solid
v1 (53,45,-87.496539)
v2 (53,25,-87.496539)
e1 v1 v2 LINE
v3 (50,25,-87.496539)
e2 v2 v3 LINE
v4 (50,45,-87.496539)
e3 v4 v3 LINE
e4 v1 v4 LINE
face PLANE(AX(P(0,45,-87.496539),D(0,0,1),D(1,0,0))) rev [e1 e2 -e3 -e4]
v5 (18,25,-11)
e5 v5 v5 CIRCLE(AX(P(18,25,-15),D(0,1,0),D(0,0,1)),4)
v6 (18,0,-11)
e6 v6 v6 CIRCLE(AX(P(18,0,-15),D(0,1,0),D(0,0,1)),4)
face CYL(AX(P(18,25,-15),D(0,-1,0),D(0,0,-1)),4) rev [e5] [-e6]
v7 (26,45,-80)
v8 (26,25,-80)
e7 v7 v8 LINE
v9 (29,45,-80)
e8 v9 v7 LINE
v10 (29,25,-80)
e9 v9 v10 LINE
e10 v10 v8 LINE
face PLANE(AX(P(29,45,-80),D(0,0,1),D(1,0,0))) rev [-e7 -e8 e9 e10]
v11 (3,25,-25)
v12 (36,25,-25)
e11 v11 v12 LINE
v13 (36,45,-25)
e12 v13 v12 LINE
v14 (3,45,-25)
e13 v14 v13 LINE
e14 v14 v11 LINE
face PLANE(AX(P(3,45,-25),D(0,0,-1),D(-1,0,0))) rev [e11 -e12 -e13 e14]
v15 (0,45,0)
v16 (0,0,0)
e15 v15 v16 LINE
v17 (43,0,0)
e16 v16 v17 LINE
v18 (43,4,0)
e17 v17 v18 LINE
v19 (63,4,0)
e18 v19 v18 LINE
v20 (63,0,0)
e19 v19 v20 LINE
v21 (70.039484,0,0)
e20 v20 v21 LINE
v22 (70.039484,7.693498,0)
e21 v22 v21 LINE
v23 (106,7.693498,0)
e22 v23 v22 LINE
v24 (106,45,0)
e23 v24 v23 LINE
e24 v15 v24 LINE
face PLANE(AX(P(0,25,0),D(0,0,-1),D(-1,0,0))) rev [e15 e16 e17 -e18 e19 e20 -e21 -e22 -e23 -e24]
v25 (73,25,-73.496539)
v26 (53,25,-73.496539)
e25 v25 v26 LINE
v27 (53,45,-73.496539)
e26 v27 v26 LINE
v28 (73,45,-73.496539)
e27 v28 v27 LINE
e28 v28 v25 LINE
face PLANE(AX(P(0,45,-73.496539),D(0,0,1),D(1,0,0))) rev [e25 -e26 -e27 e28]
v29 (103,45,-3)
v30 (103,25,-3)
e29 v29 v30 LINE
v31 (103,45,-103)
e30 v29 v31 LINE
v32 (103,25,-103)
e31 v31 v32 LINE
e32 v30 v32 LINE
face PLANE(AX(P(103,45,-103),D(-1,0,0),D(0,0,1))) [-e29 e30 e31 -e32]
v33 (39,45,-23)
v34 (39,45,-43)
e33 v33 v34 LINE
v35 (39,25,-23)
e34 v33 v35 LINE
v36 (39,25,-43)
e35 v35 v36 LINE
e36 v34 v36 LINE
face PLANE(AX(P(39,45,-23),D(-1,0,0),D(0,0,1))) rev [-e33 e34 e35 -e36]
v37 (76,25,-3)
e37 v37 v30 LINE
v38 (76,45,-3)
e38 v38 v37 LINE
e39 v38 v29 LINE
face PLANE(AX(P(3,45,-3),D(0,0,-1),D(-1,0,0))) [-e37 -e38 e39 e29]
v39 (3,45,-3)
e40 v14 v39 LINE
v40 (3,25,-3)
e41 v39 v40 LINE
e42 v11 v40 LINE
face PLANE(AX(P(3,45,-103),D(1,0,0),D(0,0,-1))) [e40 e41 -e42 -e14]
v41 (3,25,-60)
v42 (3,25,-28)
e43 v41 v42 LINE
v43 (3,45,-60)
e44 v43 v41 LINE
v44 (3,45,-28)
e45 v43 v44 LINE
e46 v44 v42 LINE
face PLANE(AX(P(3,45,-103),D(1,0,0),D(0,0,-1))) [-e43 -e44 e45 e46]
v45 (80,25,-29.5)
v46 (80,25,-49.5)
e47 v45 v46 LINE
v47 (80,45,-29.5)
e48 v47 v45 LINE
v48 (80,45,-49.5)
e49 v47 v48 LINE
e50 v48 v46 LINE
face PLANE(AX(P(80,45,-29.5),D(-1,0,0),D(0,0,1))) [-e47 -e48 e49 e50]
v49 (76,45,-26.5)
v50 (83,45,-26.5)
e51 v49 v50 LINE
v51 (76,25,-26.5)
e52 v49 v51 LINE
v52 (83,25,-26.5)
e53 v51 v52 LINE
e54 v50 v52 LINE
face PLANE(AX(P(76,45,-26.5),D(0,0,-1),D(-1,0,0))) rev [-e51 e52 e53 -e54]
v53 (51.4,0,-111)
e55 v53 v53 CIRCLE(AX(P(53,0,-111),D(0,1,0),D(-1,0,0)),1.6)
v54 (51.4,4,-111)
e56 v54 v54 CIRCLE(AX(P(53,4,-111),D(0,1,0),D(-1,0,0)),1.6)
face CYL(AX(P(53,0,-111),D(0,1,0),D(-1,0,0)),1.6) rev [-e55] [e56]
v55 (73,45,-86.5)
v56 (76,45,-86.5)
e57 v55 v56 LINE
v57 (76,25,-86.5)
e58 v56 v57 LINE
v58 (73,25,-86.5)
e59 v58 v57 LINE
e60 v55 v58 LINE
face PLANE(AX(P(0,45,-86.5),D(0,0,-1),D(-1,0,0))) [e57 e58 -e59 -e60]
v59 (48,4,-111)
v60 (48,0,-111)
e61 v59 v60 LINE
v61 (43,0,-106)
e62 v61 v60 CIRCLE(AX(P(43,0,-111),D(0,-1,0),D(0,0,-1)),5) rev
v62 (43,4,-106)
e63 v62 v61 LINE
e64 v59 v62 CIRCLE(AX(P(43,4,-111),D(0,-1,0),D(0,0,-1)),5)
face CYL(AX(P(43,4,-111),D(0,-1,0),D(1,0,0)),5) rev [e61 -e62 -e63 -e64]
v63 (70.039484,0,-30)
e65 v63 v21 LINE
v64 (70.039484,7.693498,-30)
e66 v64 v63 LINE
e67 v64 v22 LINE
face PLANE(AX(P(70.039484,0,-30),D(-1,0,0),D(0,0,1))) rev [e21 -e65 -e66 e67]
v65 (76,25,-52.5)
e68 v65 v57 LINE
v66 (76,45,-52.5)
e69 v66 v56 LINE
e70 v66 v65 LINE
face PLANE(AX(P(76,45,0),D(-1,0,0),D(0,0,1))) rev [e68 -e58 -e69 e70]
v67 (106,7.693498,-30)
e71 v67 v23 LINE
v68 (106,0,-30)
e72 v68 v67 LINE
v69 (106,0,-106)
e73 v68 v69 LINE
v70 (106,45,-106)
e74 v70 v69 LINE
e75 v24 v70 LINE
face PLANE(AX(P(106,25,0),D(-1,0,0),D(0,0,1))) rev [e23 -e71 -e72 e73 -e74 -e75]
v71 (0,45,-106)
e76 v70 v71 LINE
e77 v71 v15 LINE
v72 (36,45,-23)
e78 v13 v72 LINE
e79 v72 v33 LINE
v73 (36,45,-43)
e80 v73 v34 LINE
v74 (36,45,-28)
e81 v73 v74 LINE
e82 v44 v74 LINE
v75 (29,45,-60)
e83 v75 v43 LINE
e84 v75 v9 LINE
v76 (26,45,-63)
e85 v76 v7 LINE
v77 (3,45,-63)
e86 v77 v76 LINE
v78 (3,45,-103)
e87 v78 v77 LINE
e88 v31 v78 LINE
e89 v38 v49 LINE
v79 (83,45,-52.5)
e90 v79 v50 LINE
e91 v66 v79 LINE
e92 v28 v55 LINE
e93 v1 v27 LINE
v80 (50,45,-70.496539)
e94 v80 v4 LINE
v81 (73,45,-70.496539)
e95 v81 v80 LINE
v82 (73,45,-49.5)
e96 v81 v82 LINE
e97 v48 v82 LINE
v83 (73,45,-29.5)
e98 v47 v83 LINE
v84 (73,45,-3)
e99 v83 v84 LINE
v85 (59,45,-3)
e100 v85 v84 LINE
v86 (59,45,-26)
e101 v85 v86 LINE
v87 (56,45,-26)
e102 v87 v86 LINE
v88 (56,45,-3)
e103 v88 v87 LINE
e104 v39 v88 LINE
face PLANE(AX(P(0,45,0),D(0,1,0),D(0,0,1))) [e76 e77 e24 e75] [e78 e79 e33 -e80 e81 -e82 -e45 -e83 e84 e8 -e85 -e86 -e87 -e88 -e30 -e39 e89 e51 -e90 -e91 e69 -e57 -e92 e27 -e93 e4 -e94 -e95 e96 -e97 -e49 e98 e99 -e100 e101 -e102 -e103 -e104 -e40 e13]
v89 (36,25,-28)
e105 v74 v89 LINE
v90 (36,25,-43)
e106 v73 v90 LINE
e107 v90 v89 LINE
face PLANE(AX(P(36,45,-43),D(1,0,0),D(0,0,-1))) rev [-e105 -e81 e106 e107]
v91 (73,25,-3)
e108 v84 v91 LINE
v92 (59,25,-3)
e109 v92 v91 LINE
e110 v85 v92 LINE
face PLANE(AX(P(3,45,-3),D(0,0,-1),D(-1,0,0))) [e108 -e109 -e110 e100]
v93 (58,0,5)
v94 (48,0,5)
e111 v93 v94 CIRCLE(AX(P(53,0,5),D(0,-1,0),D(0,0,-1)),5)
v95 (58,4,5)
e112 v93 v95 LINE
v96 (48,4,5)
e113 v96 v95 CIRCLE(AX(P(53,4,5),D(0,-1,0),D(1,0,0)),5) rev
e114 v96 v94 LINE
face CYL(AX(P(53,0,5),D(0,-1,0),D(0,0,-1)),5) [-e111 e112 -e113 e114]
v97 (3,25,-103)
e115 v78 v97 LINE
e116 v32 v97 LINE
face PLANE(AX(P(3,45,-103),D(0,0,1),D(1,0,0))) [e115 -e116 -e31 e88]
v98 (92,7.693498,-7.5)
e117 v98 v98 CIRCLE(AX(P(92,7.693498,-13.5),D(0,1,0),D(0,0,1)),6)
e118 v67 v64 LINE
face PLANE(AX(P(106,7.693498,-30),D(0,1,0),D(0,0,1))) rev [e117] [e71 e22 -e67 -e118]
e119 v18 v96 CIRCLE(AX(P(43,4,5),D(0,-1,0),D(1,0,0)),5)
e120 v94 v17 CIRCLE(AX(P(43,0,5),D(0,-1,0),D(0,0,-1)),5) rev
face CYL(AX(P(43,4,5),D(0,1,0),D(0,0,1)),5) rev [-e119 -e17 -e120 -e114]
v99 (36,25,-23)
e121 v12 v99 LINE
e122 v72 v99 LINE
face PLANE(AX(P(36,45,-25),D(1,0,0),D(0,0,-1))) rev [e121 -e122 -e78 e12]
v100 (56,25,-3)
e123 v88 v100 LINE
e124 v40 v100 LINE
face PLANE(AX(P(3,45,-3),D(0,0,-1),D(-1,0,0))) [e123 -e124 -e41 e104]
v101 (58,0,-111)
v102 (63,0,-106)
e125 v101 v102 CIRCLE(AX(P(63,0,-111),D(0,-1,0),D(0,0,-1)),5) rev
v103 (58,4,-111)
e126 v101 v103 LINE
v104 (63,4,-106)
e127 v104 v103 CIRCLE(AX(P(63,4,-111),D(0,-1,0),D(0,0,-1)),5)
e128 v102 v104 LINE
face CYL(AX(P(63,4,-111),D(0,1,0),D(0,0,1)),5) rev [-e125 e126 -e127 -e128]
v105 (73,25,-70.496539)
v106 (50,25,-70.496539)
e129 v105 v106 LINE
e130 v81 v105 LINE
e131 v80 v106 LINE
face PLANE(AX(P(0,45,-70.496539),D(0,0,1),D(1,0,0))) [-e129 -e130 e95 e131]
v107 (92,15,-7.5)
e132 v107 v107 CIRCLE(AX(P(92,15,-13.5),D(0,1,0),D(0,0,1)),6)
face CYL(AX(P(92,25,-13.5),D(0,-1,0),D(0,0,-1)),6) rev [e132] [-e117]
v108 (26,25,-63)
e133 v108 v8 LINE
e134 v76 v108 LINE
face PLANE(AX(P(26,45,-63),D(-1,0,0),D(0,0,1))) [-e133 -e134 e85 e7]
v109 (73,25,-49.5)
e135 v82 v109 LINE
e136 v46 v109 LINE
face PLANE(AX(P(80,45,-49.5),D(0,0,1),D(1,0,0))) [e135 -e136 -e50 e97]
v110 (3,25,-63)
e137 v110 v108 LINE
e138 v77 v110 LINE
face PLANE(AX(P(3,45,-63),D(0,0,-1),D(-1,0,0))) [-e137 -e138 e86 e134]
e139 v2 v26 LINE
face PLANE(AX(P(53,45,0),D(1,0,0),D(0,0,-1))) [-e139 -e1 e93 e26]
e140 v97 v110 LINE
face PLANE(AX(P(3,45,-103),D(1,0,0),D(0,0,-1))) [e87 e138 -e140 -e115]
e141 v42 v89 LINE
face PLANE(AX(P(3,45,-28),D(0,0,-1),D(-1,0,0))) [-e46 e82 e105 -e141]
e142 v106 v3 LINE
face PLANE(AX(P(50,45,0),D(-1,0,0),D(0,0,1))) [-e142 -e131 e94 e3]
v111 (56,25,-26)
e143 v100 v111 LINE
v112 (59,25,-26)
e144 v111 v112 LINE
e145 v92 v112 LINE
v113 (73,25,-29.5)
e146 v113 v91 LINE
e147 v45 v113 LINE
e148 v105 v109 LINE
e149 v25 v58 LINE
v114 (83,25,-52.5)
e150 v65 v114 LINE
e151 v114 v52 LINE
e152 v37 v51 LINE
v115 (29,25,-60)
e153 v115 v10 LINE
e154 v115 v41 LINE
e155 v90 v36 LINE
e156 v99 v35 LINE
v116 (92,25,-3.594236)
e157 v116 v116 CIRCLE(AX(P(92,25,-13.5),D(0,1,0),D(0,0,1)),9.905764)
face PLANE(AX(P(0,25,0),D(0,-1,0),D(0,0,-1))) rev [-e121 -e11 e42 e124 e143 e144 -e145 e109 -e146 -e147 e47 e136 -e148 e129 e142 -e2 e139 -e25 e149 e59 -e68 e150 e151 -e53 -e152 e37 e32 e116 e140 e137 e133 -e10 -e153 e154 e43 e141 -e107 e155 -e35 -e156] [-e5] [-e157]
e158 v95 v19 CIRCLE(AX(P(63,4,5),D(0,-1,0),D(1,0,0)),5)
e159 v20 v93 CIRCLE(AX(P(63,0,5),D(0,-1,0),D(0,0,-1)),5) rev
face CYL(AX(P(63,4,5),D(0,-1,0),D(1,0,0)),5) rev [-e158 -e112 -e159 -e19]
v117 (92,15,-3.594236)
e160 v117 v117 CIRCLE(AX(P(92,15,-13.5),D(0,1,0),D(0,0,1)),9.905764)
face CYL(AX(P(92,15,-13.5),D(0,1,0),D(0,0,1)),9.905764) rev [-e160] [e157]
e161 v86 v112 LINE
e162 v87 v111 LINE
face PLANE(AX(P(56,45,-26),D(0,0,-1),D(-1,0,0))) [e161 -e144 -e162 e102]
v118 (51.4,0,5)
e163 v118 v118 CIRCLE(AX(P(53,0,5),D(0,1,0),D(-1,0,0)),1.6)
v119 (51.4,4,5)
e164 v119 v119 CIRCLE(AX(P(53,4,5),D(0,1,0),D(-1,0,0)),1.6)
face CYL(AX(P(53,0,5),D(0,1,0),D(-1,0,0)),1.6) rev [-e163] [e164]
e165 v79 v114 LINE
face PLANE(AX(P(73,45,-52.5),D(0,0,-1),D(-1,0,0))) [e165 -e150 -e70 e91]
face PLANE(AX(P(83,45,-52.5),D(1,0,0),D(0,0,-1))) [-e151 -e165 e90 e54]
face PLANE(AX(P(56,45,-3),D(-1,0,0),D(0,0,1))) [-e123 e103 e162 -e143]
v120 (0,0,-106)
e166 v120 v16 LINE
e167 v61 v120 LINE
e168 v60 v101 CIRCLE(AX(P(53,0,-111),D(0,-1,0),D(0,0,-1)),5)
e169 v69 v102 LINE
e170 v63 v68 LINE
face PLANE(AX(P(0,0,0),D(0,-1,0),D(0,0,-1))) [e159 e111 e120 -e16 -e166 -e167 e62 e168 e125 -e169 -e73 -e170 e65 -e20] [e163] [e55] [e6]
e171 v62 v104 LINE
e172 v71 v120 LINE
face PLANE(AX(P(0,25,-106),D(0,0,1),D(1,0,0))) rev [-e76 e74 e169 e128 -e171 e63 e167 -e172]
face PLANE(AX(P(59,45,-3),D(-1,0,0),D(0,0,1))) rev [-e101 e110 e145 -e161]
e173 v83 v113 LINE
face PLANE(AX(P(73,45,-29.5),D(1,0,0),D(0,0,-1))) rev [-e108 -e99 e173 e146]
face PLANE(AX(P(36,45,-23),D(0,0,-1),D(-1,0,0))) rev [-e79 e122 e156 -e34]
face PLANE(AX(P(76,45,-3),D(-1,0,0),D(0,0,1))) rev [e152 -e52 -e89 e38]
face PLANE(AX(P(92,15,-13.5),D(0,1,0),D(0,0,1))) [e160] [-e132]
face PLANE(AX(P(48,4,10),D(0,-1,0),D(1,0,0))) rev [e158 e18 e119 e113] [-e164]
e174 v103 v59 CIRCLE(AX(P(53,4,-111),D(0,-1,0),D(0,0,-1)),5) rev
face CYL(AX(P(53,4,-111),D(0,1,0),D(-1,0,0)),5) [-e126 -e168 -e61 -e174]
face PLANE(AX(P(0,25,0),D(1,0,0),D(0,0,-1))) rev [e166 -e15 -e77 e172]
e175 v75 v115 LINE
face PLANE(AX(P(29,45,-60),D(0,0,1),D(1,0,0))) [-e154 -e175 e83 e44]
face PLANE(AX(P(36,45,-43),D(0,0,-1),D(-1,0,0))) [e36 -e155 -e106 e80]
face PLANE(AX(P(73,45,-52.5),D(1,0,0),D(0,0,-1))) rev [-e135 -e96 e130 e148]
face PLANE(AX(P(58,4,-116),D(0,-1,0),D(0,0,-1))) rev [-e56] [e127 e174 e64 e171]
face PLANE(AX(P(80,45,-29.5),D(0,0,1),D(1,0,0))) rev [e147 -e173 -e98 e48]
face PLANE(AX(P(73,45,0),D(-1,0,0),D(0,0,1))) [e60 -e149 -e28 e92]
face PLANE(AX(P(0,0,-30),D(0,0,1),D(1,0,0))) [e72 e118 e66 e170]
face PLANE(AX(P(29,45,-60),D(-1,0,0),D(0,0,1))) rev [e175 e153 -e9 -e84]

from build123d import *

# Parameters (mm, degrees)
SKETCH2_W           = 106
SKETCH2_H           = 106
SKETCH2_R           = 4
SKETCH2_R_2         = 6
BOSS_EXTRUDE1_DEPTH = 25
SKETCH3_W           = 106
SKETCH3_H           = 106
SKETCH3_W_2         = 100
SKETCH3_H_2         = 100
BOSS_EXTRUDE2_DEPTH = 20
SKETCH5_W           = 3
SKETCH5_H           = 23
BOSS_EXTRUDE3_DEPTH = 20
SKETCH7_W           = 20
SKETCH7_H           = 3
BOSS_EXTRUDE4_DEPTH = 20
SKETCH9_R           = 9.905763918
CUT_EXTRUDE1_DEPTH  = 10
SKETCH10_W          = 10
SKETCH10_H          = 4
BOSS_EXTRUDE5_DEPTH = 10
SKETCH11_W          = 10
SKETCH11_H          = 4
BOSS_EXTRUDE6_DEPTH = 10
FILLET2_RADIUS      = 5
FILLET2_LENGTH      = 4
FILLET3_R           = 5
FILLET4_R           = 5
FILLET5_R           = 5
SKETCH13_R          = 1.6
CUT_EXTRUDE2_DEPTH  = 163.397660082
SKETCH14_W          = 35.96051594
SKETCH14_H          = 7.693498276
CUT_EXTRUDE3_DEPTH  = 30


with BuildPart() as part:
    # Sketch2 → Boss-Extrude1 (new body)
    with BuildSketch(Plane(origin=(0, 0, 0), x_dir=(1, 0, 0), z_dir=(0, 1, 0))):
        with Locations((53, 53)):
            Rectangle(SKETCH2_W, SKETCH2_H)
        with Locations(Location((18, 15, 0), (0, 0, 270))):
            Circle(SKETCH2_R, mode=Mode.SUBTRACT)
        with Locations(Location((92, 13.5, 0), (0, 0, 270))):
            Circle(SKETCH2_R_2, mode=Mode.SUBTRACT)
    extrude(amount=BOSS_EXTRUDE1_DEPTH)

    # Sketch3 → Boss-Extrude2 (add)
    with BuildSketch(Plane(origin=(0, 25, 0), x_dir=(1, 0, 0), z_dir=(0, 1, 0))):
        with Locations((53, 53)):
            Rectangle(SKETCH3_W, SKETCH3_H)
        with Locations((53, 53)):
            Rectangle(SKETCH3_W_2, SKETCH3_H_2, mode=Mode.SUBTRACT)
    extrude(amount=BOSS_EXTRUDE2_DEPTH)

    # Sketch5 → Boss-Extrude3 (add)
    with BuildSketch(Plane(origin=(0, 25, 0), x_dir=(1, 0, 0), z_dir=(0, 1, 0))):
        Polygon((3, 28), (3, 25), (36, 25), (36, 23), (39, 23), (39, 43), (36, 43), (36, 28), align=None)
        Polygon((83, 52.5), (83, 26.5), (76, 26.5), (76, 3), (73, 3), (73, 29.5), (80, 29.5), (80, 49.5), (73, 49.5), (73, 52.5), align=None)
        Polygon((3, 63), (3, 60), (29, 60), (29, 80), (26, 80), (26, 63), align=None)
        with Locations((57.5, 14.5)):
            Rectangle(SKETCH5_W, SKETCH5_H)
    extrude(amount=BOSS_EXTRUDE3_DEPTH)

    # Sketch7 → Boss-Extrude4 (add)
    with BuildSketch(Plane(origin=(0, 25, 0), x_dir=(1, 0, 0), z_dir=(0, 1, 0))):
        Polygon((50, 70.496538655), (53, 70.496538655), (53, 73.496538655), (53, 87.496538655), (50, 87.496538655), align=None)
        with Locations((63, 71.996538655)):
            Rectangle(SKETCH7_W, SKETCH7_H)
        Polygon((73, 70.496538655), (73, 52.5), (76, 52.5), (76, 86.5), (73, 86.5), (73, 73.496538655), align=None)
    extrude(amount=BOSS_EXTRUDE4_DEPTH)

    # Sketch9 → Cut-Extrude1 (cut)
    with BuildSketch(Plane(origin=(0, 25, 0), x_dir=(1, 0, 0), z_dir=(0, 1, 0))):
        with Locations(Location((92, 13.5, 0), (0, 0, 270))):
            Circle(SKETCH9_R)
    extrude(amount=-CUT_EXTRUDE1_DEPTH, mode=Mode.SUBTRACT)

    # Sketch10 → Boss-Extrude5 (add)
    with BuildSketch(Plane.XY):
        with Locations((53, 2)):
            Rectangle(SKETCH10_W, SKETCH10_H)
    extrude(amount=BOSS_EXTRUDE5_DEPTH)

    # Sketch11 → Boss-Extrude6 (add)
    with BuildSketch(Plane(origin=(0, 0, -106), x_dir=(-1, 0, 0), z_dir=(0, 0, -1))):
        with Locations((-53, 2)):
            Rectangle(SKETCH11_W, SKETCH11_H)
    extrude(amount=BOSS_EXTRUDE6_DEPTH)

    # Fillet2: full round fillet: the end face becomes a half cylinder, R = half its width
    fillet2_face = Plane((53, 2, -116), x_dir=(0, -1, 0), z_dir=(0, 0, -1))  # on the end face: x along it, z out of the body
    fillet2_slab = fillet2_face.offset(-FILLET2_RADIUS / 2) * Box(FILLET2_LENGTH, 2 * FILLET2_RADIUS, FILLET2_RADIUS, mode=Mode.PRIVATE)  # the body's end, R deep
    fillet2_round = Plane((53, 2, -111), x_dir=(0, 0, -1), z_dir=(0, -1, 0)) * Cylinder(FILLET2_RADIUS, FILLET2_LENGTH, mode=Mode.PRIVATE)  # its axis R under the face
    add(fillet2_slab - fillet2_round, mode=Mode.SUBTRACT)

    # Fillet3
    fillet3_edges = [part.edges().sort_by_distance(p)[0] for p in [
        (48, 2, -106),
        (58, 2, -106),
    ]]
    fillet(fillet3_edges, radius=FILLET3_R - 0.0001)  # a hair under: the kernel refuses the full size

    # Fillet4
    fillet4_edges = [part.edges().sort_by_distance(p)[0] for p in [
        (48, 2, 0),
        (58, 2, 0),
    ]]
    fillet(fillet4_edges, radius=FILLET4_R)

    # Fillet5
    fillet5_edges = [part.edges().sort_by_distance(p)[0] for p in [
        (48, 2, 10),
        (58, 2, 10),
    ]]
    fillet(fillet5_edges, radius=FILLET5_R - 0.0001)  # a hair under: the kernel refuses the full size

    # Sketch13 → Cut-Extrude2 (cut, through all)
    with BuildSketch(Plane(origin=(0, 4, 0), x_dir=(1, 0, 0), z_dir=(0, 1, 0))):
        with Locations(Location((53, -5, 0), (0, 0, 180))):
            Circle(SKETCH13_R)
        with Locations(Location((53, 111, 0), (0, 0, 180))):
            Circle(SKETCH13_R)
    extrude(amount=-CUT_EXTRUDE2_DEPTH, mode=Mode.SUBTRACT)

    # Sketch14 → Cut-Extrude3 (cut)
    with BuildSketch(Plane.XY):
        with Locations((88.01974203, 3.846749138)):
            Rectangle(SKETCH14_W, SKETCH14_H)
    extrude(amount=-CUT_EXTRUDE3_DEPTH, mode=Mode.SUBTRACT)


solid = part.part
